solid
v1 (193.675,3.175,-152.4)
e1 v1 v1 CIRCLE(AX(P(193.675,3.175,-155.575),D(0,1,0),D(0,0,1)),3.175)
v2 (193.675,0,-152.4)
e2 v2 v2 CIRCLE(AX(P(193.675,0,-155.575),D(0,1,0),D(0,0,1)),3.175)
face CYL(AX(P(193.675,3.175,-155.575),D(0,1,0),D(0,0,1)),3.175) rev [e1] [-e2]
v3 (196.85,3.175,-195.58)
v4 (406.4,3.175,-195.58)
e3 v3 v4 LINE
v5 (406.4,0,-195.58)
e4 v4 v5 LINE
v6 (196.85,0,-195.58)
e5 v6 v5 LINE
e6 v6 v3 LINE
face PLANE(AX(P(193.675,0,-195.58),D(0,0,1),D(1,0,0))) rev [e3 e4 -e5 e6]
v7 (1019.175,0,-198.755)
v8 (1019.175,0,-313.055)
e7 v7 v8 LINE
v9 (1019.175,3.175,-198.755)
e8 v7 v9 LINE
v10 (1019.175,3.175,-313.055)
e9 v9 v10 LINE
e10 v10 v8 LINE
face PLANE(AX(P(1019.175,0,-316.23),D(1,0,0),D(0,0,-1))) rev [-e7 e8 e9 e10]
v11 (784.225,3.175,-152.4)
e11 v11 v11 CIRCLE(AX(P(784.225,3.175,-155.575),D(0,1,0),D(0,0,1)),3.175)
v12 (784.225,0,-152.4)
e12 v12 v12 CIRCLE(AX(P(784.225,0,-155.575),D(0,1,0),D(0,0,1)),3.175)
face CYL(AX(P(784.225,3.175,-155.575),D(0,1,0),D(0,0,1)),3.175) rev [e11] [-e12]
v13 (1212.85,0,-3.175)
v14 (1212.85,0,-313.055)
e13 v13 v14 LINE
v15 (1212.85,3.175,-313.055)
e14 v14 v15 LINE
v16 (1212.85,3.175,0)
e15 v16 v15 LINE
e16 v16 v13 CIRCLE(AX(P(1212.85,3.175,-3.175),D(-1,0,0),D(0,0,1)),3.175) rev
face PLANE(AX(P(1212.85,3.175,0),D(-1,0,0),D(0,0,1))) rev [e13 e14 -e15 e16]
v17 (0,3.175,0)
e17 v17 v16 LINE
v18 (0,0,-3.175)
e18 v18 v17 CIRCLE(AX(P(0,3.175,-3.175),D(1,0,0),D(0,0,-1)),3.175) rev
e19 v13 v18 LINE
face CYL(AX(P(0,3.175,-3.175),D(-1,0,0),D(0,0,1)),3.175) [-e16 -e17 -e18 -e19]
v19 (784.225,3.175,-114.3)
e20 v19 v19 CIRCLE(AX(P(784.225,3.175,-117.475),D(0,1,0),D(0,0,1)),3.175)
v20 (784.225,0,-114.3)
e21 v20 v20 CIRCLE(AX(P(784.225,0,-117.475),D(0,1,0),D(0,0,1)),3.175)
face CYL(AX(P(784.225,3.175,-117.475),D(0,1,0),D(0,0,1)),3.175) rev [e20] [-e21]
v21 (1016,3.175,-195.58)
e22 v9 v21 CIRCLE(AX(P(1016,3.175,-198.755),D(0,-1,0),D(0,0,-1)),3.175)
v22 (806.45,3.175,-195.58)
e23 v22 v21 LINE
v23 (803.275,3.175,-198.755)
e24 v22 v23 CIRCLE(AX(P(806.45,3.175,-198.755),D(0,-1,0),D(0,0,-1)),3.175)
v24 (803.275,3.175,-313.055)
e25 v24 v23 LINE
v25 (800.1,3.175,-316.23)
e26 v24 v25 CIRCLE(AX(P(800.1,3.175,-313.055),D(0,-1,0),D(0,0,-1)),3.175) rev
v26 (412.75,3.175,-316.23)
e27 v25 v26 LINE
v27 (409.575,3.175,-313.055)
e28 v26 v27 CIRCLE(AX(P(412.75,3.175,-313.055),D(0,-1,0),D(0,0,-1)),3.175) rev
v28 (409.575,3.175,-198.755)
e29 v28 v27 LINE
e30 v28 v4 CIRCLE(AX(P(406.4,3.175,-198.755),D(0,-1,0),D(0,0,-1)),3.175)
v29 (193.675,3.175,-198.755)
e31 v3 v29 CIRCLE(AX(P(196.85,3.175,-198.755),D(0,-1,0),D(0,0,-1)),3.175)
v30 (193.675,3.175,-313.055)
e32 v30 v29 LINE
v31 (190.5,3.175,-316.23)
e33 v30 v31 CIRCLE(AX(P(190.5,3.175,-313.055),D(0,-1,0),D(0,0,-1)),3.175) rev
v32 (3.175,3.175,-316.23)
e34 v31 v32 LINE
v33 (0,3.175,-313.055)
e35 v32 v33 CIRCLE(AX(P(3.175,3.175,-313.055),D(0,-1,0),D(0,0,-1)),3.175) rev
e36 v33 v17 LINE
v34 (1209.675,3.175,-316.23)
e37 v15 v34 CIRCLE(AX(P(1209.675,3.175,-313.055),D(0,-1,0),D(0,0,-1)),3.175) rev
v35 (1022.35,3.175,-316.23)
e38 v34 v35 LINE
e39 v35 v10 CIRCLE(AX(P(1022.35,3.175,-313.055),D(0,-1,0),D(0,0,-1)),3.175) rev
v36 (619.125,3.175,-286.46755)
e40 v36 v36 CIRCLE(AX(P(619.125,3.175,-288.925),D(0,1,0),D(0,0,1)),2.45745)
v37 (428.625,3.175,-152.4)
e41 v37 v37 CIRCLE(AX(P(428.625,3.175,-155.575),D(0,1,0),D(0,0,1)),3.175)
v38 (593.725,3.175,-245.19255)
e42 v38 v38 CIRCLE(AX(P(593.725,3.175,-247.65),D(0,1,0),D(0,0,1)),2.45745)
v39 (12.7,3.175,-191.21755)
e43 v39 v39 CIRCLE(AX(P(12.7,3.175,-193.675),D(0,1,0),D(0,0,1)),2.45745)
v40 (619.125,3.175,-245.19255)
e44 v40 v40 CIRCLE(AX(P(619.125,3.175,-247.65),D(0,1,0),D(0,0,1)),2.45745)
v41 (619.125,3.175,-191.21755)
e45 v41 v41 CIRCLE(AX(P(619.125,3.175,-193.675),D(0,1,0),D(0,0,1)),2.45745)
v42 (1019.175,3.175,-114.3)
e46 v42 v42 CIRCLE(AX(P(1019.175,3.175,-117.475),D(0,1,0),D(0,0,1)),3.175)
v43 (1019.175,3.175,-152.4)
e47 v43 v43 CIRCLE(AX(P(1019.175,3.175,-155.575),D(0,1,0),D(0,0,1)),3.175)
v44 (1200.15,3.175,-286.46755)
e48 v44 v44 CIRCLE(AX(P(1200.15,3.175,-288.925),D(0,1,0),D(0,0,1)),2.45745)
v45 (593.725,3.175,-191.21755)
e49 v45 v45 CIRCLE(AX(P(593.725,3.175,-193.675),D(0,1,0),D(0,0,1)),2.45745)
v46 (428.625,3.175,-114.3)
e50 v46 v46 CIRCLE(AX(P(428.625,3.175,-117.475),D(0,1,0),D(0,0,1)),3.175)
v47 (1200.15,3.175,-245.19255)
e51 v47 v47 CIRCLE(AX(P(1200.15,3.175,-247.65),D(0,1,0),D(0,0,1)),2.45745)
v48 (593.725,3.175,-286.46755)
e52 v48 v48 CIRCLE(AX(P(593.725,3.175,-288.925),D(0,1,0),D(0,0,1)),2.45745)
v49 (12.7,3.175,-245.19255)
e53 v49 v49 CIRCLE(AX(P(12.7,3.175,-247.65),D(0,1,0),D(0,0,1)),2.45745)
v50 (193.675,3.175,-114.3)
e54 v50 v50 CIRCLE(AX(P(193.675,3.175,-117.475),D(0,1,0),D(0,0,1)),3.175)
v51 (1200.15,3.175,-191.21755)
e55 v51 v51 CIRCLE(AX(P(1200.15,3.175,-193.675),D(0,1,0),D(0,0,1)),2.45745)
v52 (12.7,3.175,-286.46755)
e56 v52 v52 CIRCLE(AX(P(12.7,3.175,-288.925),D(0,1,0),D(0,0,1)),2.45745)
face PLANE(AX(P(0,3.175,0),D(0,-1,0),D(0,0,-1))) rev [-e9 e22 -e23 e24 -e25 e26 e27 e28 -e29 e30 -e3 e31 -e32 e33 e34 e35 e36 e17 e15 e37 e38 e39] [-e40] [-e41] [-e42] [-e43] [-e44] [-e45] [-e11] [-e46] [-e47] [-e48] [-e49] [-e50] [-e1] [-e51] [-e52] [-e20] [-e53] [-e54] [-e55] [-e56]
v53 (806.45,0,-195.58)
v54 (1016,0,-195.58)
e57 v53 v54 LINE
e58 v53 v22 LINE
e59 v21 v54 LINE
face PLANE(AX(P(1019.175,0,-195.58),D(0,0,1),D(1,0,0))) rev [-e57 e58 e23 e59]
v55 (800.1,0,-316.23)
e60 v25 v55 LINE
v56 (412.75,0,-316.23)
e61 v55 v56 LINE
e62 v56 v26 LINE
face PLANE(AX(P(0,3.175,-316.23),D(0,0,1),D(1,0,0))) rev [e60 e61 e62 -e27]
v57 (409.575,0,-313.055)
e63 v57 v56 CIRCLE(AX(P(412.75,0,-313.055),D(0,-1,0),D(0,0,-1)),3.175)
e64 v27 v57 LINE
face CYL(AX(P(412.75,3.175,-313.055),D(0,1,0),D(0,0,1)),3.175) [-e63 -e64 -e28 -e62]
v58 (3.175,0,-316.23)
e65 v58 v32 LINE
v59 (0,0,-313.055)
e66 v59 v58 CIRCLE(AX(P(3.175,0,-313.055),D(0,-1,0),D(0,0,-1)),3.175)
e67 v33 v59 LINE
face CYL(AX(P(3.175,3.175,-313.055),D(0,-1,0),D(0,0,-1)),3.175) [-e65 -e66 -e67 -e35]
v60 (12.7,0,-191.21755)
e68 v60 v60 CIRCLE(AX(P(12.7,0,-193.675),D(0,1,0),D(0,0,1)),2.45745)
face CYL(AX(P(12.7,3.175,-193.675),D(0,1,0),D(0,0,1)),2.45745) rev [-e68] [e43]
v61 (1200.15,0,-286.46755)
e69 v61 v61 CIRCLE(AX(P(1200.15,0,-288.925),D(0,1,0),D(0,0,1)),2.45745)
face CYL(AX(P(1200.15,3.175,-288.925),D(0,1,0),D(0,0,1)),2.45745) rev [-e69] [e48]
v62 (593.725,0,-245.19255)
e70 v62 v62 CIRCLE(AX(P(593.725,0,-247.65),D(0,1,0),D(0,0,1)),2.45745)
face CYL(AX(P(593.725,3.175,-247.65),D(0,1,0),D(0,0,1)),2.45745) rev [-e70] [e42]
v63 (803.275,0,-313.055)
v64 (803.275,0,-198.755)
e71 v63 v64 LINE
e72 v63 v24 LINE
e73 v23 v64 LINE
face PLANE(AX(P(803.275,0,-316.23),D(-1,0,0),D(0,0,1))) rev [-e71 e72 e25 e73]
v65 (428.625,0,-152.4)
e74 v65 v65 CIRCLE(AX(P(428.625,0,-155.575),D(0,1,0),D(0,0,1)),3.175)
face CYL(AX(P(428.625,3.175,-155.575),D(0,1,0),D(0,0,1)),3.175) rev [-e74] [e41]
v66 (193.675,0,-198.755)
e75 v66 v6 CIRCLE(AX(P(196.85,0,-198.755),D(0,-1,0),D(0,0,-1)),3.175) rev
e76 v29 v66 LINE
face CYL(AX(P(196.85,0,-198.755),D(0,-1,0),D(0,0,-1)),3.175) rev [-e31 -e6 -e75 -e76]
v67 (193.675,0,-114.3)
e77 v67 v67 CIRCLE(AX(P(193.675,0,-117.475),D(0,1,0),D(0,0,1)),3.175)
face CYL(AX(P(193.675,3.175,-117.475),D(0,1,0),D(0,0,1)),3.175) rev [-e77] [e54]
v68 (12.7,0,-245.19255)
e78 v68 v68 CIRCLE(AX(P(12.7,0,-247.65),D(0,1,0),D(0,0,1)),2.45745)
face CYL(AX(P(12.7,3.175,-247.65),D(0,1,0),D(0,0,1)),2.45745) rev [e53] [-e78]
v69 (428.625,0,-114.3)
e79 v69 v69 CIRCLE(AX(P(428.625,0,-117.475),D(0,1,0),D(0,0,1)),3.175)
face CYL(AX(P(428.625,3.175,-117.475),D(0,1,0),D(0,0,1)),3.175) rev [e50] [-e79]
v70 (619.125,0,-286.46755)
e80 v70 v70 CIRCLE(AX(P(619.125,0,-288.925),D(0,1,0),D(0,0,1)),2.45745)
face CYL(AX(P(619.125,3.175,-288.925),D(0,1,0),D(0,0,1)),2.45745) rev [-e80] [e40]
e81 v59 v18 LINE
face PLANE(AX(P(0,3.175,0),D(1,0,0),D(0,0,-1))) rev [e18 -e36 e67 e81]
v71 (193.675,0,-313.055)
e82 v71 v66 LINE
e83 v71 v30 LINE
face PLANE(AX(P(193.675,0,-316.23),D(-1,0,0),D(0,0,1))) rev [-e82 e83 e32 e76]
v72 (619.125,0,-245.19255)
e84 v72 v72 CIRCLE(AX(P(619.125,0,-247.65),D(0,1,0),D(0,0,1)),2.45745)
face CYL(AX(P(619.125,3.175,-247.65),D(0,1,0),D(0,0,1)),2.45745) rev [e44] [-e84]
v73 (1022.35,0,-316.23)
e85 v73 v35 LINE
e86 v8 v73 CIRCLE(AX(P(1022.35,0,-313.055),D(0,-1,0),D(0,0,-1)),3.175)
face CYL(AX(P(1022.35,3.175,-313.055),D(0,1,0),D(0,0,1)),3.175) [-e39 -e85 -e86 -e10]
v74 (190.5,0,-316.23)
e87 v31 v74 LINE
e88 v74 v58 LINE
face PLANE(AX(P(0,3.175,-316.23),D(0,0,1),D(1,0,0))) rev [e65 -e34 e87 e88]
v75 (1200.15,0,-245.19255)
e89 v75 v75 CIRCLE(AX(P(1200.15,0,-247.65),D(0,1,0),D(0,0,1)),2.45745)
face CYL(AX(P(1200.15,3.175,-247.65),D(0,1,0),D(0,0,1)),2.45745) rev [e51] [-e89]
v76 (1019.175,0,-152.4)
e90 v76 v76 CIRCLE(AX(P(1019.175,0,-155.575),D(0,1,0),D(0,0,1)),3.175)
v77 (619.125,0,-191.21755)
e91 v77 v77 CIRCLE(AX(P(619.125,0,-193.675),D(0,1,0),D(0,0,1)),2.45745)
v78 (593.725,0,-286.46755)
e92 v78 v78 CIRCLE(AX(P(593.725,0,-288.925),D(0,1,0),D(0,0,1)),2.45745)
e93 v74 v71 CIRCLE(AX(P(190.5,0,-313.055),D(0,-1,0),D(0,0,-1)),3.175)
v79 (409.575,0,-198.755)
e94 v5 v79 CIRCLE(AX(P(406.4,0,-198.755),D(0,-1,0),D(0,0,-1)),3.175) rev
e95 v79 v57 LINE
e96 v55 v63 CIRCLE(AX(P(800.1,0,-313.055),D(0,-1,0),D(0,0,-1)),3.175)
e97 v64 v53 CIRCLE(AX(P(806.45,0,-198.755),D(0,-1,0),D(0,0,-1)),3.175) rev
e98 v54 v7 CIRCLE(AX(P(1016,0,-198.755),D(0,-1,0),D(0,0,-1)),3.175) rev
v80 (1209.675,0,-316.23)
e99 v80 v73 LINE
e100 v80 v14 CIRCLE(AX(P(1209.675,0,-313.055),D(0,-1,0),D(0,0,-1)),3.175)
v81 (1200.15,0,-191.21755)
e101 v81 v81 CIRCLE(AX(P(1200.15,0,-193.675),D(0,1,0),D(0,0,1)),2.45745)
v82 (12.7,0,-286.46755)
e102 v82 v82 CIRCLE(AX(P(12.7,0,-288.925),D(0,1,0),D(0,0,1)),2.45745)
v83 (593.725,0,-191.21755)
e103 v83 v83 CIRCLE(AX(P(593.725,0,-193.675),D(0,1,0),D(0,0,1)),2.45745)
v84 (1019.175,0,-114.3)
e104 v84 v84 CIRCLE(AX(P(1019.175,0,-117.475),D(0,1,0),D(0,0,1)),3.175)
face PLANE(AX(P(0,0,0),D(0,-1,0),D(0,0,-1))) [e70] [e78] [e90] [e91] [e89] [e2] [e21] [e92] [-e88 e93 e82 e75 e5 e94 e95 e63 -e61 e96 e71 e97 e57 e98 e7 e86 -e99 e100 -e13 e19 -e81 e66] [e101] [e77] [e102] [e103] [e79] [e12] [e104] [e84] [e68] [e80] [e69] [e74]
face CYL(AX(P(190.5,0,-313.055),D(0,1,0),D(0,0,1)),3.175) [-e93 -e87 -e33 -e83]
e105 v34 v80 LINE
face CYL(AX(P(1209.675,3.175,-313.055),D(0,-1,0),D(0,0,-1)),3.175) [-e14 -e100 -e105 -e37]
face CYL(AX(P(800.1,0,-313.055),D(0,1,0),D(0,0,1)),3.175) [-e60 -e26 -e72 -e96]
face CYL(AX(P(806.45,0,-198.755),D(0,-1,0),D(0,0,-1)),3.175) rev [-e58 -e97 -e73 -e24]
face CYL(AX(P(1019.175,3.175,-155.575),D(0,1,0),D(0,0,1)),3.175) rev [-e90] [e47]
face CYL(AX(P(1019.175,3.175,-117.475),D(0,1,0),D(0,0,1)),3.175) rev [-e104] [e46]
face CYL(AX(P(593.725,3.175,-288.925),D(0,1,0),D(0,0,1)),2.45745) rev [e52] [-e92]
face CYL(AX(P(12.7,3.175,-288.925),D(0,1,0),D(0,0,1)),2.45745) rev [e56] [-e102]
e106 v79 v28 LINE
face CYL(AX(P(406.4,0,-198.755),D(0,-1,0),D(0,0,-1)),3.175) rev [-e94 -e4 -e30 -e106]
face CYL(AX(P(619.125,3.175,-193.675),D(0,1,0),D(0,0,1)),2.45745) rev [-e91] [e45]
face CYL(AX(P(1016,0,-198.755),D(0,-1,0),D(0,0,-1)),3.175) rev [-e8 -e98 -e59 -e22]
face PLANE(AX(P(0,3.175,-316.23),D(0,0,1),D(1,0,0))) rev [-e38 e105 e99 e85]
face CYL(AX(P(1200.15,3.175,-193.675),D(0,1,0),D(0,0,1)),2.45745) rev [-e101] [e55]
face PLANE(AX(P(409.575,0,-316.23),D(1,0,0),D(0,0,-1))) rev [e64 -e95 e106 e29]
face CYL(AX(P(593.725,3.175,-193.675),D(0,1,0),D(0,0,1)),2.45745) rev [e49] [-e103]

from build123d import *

# Parameters (mm, degrees)
SKETCH1_W                    = 1212.85
SKETCH1_H                    = 316.23
BOSS_EXTRUDE1_DEPTH          = 3.175
FILLET1_R                    = 3.175
SKETCH4_W                    = 215.9
SKETCH4_H                    = 120.65
CUT_EXTRUDE1_DEPTH           = 1254.402016922
FILLET2_R                    = 3.175
F_10_0_1935_DIAMETER_HOLE1_D = 4.9149
F_1_4_0_25_DIAMETER_HOLE1_D  = 6.35


with BuildPart() as part:
    # Sketch1 → Boss-Extrude1 (new body)
    with BuildSketch(Plane(origin=(0, 0, 0), x_dir=(1, 0, 0), z_dir=(0, 1, 0))):
        with Locations((606.425, 158.115)):
            Rectangle(SKETCH1_W, SKETCH1_H)
    extrude(amount=BOSS_EXTRUDE1_DEPTH)

    # Fillet1
    fillet1_edges = [part.edges().sort_by_distance(p)[0] for p in [
        (606.425, 0, 0),
    ]]
    fillet(fillet1_edges, radius=FILLET1_R - 0.0001)  # a hair under: the kernel refuses the full size

    # Sketch4 → Cut-Extrude1 (cut, through all)
    with BuildSketch(Plane(origin=(0, 3.175, 0), x_dir=(1, 0, 0), z_dir=(0, 1, 0))):
        with Locations((301.625, 255.905)):
            Rectangle(SKETCH4_W, SKETCH4_H)
        with Locations((911.225, 255.905)):
            Rectangle(SKETCH4_W, SKETCH4_H)
    extrude(amount=-CUT_EXTRUDE1_DEPTH, mode=Mode.SUBTRACT)

    # Fillet2
    fillet2_edges = [part.edges().sort_by_distance(p)[0] for p in [
        (193.675, 1.5875, -195.58),
        (193.675, 1.5875, -316.23),
        (409.575, 1.5875, -316.23),
        (409.575, 1.5875, -195.58),
        (803.275, 1.5875, -316.23),
        (1019.175, 1.5875, -316.23),
        (1019.175, 1.5875, -195.58),
        (803.275, 1.5875, -195.58),
        (0, 1.5875, -316.23),
        (1212.85, 1.5875, -316.23),
    ]]
    fillet(fillet2_edges, radius=FILLET2_R)

    # #10 (0.1935) Diameter Hole1 (through all)
    with Locations(Plane(origin=(0, 3.175, 0), x_dir=(1, 0, 0), z_dir=(0, 1, 0))):
        with Locations((12.7, 193.675), (12.7, 247.65), (12.7, 288.925), (593.725, 193.675), (593.725, 247.65), (593.725, 288.925), (619.125, 288.925), (619.125, 247.65), (619.125, 193.675), (1200.15, 288.925), (1200.15, 247.65), (1200.15, 193.675)):
            Hole(F_10_0_1935_DIAMETER_HOLE1_D / 2)

    # 1/4 (0.25) Diameter Hole1 (through all)
    with Locations(Plane(origin=(0, 3.175, 0), x_dir=(1, 0, 0), z_dir=(0, 1, 0))):
        with Locations((193.675, 155.575), (193.675, 117.475), (428.625, 155.575), (428.625, 117.475), (784.225, 117.475), (784.225, 155.575), (1019.175, 117.475), (1019.175, 155.575)):
            Hole(F_1_4_0_25_DIAMETER_HOLE1_D / 2)


solid = part.part
